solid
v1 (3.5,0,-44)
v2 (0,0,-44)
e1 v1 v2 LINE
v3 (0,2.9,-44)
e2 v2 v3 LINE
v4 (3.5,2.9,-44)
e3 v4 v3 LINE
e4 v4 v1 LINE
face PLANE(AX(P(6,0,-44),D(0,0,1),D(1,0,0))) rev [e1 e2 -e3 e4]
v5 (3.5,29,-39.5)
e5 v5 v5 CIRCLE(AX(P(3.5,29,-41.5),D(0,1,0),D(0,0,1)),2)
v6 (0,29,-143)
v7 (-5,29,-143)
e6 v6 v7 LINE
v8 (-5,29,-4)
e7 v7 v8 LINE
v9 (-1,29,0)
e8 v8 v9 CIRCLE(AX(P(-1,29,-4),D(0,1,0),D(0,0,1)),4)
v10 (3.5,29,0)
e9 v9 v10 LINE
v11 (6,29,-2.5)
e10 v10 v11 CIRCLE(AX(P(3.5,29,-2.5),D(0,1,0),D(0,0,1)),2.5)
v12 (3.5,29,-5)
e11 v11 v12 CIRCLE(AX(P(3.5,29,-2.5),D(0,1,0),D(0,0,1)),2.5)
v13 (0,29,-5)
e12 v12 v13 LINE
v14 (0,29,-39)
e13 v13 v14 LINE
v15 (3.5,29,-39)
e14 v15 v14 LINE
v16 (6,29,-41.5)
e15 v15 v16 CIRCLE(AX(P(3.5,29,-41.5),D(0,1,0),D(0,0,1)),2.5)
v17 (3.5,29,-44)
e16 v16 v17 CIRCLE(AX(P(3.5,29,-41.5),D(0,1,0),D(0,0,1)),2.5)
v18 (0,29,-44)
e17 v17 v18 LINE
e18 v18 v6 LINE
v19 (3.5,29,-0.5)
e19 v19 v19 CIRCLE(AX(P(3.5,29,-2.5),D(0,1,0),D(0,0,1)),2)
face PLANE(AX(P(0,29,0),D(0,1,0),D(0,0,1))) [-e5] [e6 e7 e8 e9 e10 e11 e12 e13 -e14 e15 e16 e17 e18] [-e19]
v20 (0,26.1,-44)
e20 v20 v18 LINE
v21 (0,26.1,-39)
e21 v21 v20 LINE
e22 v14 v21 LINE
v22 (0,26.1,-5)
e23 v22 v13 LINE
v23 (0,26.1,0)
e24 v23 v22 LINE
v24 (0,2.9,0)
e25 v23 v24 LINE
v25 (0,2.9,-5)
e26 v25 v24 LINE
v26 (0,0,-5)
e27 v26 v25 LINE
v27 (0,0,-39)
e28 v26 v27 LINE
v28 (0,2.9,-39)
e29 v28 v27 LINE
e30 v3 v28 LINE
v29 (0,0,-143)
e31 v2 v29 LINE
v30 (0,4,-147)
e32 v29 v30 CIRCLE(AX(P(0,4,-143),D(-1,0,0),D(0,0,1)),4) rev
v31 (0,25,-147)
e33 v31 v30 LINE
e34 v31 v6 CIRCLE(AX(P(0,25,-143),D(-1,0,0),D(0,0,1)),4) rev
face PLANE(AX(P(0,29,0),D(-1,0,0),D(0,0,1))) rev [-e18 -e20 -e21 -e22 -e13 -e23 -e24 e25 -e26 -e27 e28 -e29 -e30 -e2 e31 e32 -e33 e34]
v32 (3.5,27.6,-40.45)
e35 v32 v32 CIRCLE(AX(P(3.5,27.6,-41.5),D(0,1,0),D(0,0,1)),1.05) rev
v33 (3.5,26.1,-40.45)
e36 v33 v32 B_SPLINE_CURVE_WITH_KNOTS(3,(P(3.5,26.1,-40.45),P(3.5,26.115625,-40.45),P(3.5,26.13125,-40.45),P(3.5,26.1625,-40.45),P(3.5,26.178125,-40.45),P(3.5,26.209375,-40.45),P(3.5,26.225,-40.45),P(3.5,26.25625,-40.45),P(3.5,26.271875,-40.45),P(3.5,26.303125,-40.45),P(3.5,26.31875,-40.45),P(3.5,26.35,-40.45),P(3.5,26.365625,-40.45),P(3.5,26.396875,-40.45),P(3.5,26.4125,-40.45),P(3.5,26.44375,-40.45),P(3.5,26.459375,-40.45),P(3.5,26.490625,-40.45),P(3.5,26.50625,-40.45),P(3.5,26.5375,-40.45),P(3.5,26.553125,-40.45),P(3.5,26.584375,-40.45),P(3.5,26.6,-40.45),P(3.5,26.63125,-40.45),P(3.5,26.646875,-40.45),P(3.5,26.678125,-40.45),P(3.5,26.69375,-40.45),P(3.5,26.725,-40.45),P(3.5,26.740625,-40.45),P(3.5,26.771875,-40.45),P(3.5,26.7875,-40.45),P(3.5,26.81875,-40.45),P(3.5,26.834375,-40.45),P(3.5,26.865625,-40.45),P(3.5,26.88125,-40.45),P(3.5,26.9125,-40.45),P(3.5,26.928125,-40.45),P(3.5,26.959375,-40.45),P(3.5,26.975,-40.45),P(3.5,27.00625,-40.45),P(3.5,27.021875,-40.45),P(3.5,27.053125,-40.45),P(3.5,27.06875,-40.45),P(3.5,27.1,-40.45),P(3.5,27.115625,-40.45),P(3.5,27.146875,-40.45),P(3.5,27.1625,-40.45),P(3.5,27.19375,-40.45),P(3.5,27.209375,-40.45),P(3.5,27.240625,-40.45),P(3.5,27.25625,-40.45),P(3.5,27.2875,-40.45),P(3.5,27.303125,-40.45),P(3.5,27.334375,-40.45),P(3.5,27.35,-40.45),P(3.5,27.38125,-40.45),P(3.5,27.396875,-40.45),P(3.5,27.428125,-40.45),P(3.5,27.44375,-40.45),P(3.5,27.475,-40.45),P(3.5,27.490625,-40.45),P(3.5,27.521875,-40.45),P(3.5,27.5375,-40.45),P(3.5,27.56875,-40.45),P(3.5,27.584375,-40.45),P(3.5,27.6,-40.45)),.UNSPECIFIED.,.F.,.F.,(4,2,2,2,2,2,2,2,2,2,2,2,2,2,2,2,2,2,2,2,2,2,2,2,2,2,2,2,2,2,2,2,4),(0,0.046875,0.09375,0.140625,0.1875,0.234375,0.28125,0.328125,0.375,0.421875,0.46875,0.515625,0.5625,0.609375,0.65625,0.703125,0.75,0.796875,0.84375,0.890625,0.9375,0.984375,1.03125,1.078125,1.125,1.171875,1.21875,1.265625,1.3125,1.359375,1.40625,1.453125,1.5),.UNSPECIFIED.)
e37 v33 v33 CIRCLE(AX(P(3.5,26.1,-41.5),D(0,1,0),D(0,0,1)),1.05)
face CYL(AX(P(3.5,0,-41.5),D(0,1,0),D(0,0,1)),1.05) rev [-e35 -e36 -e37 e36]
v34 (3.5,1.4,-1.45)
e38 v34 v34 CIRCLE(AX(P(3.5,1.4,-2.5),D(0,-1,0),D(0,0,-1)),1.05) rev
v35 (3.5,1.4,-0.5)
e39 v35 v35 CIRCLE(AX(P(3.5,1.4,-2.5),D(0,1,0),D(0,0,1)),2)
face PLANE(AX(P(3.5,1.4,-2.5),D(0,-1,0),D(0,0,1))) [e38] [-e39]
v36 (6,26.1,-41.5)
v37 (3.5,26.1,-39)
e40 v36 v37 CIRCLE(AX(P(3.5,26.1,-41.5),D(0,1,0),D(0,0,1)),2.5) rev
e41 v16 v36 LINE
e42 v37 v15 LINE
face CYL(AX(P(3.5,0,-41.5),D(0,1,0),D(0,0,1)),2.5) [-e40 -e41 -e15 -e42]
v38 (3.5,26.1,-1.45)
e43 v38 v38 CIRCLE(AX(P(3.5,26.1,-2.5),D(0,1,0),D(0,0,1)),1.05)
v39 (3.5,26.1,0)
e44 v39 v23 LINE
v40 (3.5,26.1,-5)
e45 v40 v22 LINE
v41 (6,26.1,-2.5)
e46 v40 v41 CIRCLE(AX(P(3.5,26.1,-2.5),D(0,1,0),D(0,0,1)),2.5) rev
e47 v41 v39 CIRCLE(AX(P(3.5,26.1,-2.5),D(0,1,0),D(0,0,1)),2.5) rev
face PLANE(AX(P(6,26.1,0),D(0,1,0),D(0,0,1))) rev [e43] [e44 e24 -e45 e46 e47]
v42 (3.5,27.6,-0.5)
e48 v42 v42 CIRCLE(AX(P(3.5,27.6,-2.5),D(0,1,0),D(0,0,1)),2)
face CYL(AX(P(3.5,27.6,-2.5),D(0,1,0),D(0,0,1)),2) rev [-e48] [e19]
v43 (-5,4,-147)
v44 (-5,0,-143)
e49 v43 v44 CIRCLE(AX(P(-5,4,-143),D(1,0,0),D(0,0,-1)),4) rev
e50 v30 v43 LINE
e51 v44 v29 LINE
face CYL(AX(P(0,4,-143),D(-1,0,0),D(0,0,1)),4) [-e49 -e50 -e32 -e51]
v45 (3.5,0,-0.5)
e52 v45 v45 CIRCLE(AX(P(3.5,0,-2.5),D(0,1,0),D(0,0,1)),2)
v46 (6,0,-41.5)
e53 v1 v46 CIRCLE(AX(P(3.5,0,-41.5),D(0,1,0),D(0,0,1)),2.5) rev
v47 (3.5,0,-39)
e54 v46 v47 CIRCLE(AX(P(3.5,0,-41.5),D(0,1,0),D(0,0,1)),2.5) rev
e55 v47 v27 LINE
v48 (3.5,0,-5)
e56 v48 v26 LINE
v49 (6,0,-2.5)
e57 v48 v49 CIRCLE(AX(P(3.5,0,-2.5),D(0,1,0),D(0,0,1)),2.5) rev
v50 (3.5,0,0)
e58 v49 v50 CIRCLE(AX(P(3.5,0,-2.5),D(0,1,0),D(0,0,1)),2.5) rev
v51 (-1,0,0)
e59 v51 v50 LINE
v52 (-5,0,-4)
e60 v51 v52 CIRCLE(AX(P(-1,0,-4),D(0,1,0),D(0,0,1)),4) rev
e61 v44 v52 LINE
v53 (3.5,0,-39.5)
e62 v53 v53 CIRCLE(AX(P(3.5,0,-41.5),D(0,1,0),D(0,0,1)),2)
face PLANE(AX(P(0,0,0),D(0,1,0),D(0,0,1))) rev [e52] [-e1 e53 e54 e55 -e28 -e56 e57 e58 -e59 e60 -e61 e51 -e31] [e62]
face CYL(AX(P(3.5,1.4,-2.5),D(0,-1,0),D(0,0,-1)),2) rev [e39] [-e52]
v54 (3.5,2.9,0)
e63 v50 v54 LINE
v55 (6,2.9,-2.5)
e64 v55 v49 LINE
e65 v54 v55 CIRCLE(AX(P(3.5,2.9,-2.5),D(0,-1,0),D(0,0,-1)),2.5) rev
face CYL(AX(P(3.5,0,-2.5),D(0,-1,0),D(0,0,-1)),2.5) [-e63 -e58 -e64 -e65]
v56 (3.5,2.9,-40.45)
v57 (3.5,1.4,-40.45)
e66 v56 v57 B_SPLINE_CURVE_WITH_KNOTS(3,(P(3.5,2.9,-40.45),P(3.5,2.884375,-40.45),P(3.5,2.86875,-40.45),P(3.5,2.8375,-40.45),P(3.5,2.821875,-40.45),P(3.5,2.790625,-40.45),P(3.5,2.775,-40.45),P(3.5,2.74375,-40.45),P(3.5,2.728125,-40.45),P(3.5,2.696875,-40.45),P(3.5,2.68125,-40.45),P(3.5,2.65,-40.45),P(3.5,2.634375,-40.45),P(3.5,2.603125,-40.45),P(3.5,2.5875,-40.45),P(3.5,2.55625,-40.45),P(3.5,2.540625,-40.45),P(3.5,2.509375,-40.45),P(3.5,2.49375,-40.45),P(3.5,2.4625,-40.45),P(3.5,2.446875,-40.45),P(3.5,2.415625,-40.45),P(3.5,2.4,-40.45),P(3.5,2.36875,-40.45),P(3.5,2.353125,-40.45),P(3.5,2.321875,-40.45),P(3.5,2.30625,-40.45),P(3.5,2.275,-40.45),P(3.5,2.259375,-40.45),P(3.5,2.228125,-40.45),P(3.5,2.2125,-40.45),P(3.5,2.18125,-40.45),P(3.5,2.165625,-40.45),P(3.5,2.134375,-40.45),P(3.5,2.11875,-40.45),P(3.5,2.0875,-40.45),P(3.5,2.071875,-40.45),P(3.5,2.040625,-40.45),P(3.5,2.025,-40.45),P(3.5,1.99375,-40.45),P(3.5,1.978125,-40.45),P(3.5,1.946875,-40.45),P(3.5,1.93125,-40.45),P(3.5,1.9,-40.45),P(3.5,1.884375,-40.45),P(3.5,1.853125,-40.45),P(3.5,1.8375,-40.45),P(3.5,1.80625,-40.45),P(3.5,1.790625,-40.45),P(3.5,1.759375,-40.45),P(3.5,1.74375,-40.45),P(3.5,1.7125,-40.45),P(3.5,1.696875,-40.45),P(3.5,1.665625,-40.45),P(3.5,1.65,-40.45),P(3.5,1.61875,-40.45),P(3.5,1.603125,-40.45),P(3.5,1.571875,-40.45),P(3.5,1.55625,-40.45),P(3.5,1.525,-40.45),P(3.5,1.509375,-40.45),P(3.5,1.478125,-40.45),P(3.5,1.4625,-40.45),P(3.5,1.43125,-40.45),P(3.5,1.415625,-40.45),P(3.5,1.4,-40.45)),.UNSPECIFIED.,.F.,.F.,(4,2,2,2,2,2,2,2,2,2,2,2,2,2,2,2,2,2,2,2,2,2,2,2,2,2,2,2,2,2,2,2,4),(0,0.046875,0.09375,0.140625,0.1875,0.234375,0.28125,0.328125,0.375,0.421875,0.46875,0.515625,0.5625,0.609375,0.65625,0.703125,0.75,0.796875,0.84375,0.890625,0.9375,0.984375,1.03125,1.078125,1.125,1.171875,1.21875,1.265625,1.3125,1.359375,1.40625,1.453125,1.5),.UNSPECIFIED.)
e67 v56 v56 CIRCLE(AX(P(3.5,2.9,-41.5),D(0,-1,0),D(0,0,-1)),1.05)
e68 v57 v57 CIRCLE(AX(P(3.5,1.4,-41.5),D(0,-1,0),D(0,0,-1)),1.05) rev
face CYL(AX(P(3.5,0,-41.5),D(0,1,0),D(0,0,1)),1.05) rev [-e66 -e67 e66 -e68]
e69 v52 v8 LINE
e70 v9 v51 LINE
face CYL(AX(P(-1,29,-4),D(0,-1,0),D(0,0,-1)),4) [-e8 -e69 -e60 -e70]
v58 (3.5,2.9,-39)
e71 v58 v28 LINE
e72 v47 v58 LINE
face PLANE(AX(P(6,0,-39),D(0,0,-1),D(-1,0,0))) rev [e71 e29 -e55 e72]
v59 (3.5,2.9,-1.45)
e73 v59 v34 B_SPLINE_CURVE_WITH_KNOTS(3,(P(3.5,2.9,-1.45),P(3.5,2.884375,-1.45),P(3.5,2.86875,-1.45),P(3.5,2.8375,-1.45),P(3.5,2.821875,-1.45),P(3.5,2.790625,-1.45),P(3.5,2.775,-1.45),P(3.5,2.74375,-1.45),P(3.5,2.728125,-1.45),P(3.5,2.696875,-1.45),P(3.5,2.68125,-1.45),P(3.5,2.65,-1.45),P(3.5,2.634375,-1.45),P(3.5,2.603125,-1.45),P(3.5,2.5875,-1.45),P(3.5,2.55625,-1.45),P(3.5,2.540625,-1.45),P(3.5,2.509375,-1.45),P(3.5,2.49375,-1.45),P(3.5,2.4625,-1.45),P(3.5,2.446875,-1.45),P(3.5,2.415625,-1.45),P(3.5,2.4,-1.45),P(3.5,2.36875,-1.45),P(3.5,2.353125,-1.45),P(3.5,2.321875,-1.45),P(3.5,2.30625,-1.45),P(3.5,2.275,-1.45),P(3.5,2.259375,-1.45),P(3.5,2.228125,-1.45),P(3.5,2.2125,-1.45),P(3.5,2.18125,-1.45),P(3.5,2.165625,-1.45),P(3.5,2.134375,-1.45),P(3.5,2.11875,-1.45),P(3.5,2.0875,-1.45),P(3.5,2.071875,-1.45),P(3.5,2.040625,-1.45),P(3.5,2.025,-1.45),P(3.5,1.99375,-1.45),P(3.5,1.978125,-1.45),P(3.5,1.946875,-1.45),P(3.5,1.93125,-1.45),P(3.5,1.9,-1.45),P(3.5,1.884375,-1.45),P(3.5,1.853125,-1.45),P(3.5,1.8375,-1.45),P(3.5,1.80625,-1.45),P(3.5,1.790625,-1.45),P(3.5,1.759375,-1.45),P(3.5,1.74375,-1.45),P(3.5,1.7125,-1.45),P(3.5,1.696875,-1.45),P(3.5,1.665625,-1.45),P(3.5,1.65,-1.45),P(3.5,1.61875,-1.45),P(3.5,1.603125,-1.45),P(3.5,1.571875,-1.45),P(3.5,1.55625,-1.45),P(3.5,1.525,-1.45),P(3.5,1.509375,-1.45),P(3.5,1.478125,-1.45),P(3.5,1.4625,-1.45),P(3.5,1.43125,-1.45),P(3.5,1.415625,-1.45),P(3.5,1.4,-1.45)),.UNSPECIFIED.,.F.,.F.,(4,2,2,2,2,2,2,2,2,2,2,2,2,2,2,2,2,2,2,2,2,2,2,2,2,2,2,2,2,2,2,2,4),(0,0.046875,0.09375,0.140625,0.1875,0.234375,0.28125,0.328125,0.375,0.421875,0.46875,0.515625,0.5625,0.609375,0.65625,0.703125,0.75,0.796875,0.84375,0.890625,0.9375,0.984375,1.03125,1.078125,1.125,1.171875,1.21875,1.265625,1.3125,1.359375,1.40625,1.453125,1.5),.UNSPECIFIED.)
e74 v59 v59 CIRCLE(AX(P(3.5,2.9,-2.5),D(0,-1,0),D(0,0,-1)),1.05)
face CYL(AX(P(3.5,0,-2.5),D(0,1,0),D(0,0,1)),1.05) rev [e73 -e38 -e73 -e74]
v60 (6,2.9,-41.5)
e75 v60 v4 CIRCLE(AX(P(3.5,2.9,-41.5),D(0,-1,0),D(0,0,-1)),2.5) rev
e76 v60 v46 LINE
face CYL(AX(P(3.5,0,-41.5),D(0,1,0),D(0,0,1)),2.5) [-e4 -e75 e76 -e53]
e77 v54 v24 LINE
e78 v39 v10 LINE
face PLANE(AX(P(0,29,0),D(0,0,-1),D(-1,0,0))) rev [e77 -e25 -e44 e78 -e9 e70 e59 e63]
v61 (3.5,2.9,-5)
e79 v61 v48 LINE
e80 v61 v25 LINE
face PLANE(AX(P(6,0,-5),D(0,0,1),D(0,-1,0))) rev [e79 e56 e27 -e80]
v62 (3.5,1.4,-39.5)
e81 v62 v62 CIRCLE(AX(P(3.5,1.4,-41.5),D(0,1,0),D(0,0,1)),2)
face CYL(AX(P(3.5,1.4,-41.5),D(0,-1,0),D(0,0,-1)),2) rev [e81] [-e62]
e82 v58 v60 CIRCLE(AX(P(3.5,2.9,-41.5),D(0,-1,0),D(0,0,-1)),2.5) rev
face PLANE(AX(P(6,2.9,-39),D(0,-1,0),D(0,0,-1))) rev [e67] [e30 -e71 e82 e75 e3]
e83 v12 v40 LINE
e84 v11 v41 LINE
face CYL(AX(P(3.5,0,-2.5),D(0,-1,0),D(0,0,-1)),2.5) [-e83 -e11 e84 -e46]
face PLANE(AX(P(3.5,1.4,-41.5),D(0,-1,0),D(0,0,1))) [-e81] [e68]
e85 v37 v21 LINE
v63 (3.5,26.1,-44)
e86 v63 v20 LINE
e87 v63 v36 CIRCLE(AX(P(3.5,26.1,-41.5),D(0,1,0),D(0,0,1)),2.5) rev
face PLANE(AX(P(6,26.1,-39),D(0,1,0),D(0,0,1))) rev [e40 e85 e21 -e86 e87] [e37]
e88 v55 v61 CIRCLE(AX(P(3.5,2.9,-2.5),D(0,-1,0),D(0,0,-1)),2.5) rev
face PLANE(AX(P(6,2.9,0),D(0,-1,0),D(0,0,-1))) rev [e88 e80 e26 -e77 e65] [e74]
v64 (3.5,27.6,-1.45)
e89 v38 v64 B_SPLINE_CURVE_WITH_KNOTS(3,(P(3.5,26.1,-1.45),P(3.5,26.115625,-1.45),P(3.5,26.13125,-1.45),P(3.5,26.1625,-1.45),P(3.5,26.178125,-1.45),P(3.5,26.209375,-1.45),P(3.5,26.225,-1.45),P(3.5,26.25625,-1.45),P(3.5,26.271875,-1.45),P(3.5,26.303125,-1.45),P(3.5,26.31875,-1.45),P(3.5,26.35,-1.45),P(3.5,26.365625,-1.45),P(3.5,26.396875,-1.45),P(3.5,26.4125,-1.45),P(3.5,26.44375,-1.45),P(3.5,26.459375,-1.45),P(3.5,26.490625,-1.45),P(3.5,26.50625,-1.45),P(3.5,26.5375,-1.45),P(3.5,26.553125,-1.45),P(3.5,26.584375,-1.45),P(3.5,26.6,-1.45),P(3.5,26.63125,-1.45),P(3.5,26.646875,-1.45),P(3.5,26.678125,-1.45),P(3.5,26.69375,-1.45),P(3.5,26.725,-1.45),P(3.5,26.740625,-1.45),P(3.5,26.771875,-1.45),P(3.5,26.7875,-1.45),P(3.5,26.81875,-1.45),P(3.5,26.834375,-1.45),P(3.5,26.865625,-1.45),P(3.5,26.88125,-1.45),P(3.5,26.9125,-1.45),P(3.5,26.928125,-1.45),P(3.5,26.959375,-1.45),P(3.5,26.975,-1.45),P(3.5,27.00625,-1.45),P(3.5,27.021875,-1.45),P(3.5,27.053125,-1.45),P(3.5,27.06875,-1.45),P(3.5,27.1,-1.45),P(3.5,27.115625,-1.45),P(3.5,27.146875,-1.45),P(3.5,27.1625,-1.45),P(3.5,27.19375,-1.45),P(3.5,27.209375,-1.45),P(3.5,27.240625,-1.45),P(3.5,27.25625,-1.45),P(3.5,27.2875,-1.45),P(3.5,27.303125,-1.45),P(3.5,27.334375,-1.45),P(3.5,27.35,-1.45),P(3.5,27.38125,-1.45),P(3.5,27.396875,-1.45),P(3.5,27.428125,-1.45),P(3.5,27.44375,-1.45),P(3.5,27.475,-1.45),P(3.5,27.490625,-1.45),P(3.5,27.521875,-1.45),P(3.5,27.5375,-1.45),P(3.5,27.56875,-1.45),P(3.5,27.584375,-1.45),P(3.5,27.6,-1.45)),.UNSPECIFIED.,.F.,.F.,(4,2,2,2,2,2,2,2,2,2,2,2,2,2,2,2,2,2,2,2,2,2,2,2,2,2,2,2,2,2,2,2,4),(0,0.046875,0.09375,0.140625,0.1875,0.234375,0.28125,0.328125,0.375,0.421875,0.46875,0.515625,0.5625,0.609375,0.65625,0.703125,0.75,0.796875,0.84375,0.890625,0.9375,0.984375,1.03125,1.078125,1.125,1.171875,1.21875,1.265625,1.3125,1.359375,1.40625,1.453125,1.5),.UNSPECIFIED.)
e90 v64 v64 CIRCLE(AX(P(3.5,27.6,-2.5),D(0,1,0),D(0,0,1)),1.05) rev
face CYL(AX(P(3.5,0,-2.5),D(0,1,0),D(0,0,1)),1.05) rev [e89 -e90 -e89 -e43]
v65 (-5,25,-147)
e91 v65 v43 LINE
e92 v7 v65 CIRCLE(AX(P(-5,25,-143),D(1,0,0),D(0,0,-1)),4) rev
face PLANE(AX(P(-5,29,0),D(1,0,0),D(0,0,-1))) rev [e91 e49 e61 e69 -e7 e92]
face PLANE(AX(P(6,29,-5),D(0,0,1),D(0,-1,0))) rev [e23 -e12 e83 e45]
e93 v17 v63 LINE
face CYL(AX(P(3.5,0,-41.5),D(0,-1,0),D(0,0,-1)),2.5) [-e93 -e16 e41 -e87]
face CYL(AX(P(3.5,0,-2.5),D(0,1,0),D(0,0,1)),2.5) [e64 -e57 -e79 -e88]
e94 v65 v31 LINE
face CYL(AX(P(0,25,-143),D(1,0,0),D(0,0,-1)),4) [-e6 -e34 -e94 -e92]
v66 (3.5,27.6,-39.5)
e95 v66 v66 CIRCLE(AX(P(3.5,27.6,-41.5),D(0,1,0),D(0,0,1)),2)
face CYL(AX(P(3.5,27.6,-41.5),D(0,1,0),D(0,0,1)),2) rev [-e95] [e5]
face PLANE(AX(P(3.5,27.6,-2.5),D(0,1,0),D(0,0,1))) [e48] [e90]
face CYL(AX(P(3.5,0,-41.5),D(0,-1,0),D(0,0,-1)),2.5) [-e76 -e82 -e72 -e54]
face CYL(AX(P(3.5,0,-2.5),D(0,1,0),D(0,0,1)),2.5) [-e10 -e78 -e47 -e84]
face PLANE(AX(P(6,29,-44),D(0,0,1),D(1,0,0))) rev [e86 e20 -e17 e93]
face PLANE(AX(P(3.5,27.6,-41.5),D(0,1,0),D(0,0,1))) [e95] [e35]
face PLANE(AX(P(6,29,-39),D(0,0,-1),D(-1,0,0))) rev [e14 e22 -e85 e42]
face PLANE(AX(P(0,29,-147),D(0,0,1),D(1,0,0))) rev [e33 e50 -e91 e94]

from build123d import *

# Parameters (mm, degrees)
SKETCH1_W           = 5
SKETCH1_H           = 147
BOSS_EXTRUDE1_DEPTH = 29
SKETCH2_W           = 5
SKETCH2_H           = 2.9
BOSS_EXTRUDE2_DEPTH = 6
SKETCH3_R           = 1.05
CUT_EXTRUDE1_DEPTH  = 150.953326072
SKETCH4_R           = 2
CUT_EXTRUDE2_DEPTH  = 1.4
FILLET1_R           = 4
FILLET2_R           = 2.5


with BuildPart() as part:
    # Sketch1 → Boss-Extrude1 (new body)
    with BuildSketch(Plane(origin=(0, 0, 0), x_dir=(1, 0, 0), z_dir=(0, 1, 0))):
        with Locations((-2.5, 73.5)):
            Rectangle(SKETCH1_W, SKETCH1_H)
    extrude(amount=BOSS_EXTRUDE1_DEPTH)

    # Sketch2 → Boss-Extrude2 (add)
    with BuildSketch(Plane(origin=(0, 0, 0), x_dir=(0, 0, -1), z_dir=(1, 0, 0))):
        with Locations((2.5, 27.55)):
            Rectangle(SKETCH2_W, SKETCH2_H)
        with Locations((41.5, 27.55)):
            Rectangle(SKETCH2_W, SKETCH2_H)
        with Locations((41.5, 1.45)):
            Rectangle(SKETCH2_W, SKETCH2_H)
        with Locations((2.5, 1.45)):
            Rectangle(SKETCH2_W, SKETCH2_H)
    extrude(amount=BOSS_EXTRUDE2_DEPTH)

    # Sketch3 → Cut-Extrude1 (cut, through all)
    with BuildSketch(Plane(origin=(0, 29, 0), x_dir=(1, 0, 0), z_dir=(0, 1, 0))):
        with Locations(Location((3.5, 41.5, 0), (0, 0, 270))):
            Circle(SKETCH3_R)
        with Locations(Location((3.5, 2.5, 0), (0, 0, 270))):
            Circle(SKETCH3_R)
    extrude(amount=-CUT_EXTRUDE1_DEPTH, mode=Mode.SUBTRACT)

    # Sketch4 → Cut-Extrude2 (cut)
    with BuildSketch(Plane(origin=(0, 29, 0), x_dir=(1, 0, 0), z_dir=(0, 1, 0))):
        with Locations(Location((3.5, 41.5, 0), (0, 0, 270))):
            Circle(SKETCH4_R)
        with Locations(Location((3.5, 2.5, 0), (0, 0, 270))):
            Circle(SKETCH4_R)
    cut_extrude2 = extrude(amount=-CUT_EXTRUDE2_DEPTH, mode=Mode.SUBTRACT)

    # Mirror2: Cut-Extrude2 across plane
    add(cut_extrude2.mirror(Plane.ZX.offset(14.5)), mode=Mode.SUBTRACT)

    # Fillet1
    fillet1_edges = [part.edges().sort_by_distance(p)[0] for p in [
        (-2.5, 0, -147),
        (-5, 14.5, 0),
        (-2.5, 29, -147),
    ]]
    fillet(fillet1_edges, radius=FILLET1_R)

    # Fillet2
    fillet2_edges = [part.edges().sort_by_distance(p)[0] for p in [
        (6, 1.45, -5),
        (6, 1.45, 0),
        (6, 1.45, -44),
        (6, 1.45, -39),
        (6, 27.55, -44),
        (6, 27.55, -39),
        (6, 27.55, -5),
        (6, 27.55, 0),
    ]]
    fillet(fillet2_edges, radius=FILLET2_R - 0.0001)  # a hair under: the kernel refuses the full size


solid = part.part
